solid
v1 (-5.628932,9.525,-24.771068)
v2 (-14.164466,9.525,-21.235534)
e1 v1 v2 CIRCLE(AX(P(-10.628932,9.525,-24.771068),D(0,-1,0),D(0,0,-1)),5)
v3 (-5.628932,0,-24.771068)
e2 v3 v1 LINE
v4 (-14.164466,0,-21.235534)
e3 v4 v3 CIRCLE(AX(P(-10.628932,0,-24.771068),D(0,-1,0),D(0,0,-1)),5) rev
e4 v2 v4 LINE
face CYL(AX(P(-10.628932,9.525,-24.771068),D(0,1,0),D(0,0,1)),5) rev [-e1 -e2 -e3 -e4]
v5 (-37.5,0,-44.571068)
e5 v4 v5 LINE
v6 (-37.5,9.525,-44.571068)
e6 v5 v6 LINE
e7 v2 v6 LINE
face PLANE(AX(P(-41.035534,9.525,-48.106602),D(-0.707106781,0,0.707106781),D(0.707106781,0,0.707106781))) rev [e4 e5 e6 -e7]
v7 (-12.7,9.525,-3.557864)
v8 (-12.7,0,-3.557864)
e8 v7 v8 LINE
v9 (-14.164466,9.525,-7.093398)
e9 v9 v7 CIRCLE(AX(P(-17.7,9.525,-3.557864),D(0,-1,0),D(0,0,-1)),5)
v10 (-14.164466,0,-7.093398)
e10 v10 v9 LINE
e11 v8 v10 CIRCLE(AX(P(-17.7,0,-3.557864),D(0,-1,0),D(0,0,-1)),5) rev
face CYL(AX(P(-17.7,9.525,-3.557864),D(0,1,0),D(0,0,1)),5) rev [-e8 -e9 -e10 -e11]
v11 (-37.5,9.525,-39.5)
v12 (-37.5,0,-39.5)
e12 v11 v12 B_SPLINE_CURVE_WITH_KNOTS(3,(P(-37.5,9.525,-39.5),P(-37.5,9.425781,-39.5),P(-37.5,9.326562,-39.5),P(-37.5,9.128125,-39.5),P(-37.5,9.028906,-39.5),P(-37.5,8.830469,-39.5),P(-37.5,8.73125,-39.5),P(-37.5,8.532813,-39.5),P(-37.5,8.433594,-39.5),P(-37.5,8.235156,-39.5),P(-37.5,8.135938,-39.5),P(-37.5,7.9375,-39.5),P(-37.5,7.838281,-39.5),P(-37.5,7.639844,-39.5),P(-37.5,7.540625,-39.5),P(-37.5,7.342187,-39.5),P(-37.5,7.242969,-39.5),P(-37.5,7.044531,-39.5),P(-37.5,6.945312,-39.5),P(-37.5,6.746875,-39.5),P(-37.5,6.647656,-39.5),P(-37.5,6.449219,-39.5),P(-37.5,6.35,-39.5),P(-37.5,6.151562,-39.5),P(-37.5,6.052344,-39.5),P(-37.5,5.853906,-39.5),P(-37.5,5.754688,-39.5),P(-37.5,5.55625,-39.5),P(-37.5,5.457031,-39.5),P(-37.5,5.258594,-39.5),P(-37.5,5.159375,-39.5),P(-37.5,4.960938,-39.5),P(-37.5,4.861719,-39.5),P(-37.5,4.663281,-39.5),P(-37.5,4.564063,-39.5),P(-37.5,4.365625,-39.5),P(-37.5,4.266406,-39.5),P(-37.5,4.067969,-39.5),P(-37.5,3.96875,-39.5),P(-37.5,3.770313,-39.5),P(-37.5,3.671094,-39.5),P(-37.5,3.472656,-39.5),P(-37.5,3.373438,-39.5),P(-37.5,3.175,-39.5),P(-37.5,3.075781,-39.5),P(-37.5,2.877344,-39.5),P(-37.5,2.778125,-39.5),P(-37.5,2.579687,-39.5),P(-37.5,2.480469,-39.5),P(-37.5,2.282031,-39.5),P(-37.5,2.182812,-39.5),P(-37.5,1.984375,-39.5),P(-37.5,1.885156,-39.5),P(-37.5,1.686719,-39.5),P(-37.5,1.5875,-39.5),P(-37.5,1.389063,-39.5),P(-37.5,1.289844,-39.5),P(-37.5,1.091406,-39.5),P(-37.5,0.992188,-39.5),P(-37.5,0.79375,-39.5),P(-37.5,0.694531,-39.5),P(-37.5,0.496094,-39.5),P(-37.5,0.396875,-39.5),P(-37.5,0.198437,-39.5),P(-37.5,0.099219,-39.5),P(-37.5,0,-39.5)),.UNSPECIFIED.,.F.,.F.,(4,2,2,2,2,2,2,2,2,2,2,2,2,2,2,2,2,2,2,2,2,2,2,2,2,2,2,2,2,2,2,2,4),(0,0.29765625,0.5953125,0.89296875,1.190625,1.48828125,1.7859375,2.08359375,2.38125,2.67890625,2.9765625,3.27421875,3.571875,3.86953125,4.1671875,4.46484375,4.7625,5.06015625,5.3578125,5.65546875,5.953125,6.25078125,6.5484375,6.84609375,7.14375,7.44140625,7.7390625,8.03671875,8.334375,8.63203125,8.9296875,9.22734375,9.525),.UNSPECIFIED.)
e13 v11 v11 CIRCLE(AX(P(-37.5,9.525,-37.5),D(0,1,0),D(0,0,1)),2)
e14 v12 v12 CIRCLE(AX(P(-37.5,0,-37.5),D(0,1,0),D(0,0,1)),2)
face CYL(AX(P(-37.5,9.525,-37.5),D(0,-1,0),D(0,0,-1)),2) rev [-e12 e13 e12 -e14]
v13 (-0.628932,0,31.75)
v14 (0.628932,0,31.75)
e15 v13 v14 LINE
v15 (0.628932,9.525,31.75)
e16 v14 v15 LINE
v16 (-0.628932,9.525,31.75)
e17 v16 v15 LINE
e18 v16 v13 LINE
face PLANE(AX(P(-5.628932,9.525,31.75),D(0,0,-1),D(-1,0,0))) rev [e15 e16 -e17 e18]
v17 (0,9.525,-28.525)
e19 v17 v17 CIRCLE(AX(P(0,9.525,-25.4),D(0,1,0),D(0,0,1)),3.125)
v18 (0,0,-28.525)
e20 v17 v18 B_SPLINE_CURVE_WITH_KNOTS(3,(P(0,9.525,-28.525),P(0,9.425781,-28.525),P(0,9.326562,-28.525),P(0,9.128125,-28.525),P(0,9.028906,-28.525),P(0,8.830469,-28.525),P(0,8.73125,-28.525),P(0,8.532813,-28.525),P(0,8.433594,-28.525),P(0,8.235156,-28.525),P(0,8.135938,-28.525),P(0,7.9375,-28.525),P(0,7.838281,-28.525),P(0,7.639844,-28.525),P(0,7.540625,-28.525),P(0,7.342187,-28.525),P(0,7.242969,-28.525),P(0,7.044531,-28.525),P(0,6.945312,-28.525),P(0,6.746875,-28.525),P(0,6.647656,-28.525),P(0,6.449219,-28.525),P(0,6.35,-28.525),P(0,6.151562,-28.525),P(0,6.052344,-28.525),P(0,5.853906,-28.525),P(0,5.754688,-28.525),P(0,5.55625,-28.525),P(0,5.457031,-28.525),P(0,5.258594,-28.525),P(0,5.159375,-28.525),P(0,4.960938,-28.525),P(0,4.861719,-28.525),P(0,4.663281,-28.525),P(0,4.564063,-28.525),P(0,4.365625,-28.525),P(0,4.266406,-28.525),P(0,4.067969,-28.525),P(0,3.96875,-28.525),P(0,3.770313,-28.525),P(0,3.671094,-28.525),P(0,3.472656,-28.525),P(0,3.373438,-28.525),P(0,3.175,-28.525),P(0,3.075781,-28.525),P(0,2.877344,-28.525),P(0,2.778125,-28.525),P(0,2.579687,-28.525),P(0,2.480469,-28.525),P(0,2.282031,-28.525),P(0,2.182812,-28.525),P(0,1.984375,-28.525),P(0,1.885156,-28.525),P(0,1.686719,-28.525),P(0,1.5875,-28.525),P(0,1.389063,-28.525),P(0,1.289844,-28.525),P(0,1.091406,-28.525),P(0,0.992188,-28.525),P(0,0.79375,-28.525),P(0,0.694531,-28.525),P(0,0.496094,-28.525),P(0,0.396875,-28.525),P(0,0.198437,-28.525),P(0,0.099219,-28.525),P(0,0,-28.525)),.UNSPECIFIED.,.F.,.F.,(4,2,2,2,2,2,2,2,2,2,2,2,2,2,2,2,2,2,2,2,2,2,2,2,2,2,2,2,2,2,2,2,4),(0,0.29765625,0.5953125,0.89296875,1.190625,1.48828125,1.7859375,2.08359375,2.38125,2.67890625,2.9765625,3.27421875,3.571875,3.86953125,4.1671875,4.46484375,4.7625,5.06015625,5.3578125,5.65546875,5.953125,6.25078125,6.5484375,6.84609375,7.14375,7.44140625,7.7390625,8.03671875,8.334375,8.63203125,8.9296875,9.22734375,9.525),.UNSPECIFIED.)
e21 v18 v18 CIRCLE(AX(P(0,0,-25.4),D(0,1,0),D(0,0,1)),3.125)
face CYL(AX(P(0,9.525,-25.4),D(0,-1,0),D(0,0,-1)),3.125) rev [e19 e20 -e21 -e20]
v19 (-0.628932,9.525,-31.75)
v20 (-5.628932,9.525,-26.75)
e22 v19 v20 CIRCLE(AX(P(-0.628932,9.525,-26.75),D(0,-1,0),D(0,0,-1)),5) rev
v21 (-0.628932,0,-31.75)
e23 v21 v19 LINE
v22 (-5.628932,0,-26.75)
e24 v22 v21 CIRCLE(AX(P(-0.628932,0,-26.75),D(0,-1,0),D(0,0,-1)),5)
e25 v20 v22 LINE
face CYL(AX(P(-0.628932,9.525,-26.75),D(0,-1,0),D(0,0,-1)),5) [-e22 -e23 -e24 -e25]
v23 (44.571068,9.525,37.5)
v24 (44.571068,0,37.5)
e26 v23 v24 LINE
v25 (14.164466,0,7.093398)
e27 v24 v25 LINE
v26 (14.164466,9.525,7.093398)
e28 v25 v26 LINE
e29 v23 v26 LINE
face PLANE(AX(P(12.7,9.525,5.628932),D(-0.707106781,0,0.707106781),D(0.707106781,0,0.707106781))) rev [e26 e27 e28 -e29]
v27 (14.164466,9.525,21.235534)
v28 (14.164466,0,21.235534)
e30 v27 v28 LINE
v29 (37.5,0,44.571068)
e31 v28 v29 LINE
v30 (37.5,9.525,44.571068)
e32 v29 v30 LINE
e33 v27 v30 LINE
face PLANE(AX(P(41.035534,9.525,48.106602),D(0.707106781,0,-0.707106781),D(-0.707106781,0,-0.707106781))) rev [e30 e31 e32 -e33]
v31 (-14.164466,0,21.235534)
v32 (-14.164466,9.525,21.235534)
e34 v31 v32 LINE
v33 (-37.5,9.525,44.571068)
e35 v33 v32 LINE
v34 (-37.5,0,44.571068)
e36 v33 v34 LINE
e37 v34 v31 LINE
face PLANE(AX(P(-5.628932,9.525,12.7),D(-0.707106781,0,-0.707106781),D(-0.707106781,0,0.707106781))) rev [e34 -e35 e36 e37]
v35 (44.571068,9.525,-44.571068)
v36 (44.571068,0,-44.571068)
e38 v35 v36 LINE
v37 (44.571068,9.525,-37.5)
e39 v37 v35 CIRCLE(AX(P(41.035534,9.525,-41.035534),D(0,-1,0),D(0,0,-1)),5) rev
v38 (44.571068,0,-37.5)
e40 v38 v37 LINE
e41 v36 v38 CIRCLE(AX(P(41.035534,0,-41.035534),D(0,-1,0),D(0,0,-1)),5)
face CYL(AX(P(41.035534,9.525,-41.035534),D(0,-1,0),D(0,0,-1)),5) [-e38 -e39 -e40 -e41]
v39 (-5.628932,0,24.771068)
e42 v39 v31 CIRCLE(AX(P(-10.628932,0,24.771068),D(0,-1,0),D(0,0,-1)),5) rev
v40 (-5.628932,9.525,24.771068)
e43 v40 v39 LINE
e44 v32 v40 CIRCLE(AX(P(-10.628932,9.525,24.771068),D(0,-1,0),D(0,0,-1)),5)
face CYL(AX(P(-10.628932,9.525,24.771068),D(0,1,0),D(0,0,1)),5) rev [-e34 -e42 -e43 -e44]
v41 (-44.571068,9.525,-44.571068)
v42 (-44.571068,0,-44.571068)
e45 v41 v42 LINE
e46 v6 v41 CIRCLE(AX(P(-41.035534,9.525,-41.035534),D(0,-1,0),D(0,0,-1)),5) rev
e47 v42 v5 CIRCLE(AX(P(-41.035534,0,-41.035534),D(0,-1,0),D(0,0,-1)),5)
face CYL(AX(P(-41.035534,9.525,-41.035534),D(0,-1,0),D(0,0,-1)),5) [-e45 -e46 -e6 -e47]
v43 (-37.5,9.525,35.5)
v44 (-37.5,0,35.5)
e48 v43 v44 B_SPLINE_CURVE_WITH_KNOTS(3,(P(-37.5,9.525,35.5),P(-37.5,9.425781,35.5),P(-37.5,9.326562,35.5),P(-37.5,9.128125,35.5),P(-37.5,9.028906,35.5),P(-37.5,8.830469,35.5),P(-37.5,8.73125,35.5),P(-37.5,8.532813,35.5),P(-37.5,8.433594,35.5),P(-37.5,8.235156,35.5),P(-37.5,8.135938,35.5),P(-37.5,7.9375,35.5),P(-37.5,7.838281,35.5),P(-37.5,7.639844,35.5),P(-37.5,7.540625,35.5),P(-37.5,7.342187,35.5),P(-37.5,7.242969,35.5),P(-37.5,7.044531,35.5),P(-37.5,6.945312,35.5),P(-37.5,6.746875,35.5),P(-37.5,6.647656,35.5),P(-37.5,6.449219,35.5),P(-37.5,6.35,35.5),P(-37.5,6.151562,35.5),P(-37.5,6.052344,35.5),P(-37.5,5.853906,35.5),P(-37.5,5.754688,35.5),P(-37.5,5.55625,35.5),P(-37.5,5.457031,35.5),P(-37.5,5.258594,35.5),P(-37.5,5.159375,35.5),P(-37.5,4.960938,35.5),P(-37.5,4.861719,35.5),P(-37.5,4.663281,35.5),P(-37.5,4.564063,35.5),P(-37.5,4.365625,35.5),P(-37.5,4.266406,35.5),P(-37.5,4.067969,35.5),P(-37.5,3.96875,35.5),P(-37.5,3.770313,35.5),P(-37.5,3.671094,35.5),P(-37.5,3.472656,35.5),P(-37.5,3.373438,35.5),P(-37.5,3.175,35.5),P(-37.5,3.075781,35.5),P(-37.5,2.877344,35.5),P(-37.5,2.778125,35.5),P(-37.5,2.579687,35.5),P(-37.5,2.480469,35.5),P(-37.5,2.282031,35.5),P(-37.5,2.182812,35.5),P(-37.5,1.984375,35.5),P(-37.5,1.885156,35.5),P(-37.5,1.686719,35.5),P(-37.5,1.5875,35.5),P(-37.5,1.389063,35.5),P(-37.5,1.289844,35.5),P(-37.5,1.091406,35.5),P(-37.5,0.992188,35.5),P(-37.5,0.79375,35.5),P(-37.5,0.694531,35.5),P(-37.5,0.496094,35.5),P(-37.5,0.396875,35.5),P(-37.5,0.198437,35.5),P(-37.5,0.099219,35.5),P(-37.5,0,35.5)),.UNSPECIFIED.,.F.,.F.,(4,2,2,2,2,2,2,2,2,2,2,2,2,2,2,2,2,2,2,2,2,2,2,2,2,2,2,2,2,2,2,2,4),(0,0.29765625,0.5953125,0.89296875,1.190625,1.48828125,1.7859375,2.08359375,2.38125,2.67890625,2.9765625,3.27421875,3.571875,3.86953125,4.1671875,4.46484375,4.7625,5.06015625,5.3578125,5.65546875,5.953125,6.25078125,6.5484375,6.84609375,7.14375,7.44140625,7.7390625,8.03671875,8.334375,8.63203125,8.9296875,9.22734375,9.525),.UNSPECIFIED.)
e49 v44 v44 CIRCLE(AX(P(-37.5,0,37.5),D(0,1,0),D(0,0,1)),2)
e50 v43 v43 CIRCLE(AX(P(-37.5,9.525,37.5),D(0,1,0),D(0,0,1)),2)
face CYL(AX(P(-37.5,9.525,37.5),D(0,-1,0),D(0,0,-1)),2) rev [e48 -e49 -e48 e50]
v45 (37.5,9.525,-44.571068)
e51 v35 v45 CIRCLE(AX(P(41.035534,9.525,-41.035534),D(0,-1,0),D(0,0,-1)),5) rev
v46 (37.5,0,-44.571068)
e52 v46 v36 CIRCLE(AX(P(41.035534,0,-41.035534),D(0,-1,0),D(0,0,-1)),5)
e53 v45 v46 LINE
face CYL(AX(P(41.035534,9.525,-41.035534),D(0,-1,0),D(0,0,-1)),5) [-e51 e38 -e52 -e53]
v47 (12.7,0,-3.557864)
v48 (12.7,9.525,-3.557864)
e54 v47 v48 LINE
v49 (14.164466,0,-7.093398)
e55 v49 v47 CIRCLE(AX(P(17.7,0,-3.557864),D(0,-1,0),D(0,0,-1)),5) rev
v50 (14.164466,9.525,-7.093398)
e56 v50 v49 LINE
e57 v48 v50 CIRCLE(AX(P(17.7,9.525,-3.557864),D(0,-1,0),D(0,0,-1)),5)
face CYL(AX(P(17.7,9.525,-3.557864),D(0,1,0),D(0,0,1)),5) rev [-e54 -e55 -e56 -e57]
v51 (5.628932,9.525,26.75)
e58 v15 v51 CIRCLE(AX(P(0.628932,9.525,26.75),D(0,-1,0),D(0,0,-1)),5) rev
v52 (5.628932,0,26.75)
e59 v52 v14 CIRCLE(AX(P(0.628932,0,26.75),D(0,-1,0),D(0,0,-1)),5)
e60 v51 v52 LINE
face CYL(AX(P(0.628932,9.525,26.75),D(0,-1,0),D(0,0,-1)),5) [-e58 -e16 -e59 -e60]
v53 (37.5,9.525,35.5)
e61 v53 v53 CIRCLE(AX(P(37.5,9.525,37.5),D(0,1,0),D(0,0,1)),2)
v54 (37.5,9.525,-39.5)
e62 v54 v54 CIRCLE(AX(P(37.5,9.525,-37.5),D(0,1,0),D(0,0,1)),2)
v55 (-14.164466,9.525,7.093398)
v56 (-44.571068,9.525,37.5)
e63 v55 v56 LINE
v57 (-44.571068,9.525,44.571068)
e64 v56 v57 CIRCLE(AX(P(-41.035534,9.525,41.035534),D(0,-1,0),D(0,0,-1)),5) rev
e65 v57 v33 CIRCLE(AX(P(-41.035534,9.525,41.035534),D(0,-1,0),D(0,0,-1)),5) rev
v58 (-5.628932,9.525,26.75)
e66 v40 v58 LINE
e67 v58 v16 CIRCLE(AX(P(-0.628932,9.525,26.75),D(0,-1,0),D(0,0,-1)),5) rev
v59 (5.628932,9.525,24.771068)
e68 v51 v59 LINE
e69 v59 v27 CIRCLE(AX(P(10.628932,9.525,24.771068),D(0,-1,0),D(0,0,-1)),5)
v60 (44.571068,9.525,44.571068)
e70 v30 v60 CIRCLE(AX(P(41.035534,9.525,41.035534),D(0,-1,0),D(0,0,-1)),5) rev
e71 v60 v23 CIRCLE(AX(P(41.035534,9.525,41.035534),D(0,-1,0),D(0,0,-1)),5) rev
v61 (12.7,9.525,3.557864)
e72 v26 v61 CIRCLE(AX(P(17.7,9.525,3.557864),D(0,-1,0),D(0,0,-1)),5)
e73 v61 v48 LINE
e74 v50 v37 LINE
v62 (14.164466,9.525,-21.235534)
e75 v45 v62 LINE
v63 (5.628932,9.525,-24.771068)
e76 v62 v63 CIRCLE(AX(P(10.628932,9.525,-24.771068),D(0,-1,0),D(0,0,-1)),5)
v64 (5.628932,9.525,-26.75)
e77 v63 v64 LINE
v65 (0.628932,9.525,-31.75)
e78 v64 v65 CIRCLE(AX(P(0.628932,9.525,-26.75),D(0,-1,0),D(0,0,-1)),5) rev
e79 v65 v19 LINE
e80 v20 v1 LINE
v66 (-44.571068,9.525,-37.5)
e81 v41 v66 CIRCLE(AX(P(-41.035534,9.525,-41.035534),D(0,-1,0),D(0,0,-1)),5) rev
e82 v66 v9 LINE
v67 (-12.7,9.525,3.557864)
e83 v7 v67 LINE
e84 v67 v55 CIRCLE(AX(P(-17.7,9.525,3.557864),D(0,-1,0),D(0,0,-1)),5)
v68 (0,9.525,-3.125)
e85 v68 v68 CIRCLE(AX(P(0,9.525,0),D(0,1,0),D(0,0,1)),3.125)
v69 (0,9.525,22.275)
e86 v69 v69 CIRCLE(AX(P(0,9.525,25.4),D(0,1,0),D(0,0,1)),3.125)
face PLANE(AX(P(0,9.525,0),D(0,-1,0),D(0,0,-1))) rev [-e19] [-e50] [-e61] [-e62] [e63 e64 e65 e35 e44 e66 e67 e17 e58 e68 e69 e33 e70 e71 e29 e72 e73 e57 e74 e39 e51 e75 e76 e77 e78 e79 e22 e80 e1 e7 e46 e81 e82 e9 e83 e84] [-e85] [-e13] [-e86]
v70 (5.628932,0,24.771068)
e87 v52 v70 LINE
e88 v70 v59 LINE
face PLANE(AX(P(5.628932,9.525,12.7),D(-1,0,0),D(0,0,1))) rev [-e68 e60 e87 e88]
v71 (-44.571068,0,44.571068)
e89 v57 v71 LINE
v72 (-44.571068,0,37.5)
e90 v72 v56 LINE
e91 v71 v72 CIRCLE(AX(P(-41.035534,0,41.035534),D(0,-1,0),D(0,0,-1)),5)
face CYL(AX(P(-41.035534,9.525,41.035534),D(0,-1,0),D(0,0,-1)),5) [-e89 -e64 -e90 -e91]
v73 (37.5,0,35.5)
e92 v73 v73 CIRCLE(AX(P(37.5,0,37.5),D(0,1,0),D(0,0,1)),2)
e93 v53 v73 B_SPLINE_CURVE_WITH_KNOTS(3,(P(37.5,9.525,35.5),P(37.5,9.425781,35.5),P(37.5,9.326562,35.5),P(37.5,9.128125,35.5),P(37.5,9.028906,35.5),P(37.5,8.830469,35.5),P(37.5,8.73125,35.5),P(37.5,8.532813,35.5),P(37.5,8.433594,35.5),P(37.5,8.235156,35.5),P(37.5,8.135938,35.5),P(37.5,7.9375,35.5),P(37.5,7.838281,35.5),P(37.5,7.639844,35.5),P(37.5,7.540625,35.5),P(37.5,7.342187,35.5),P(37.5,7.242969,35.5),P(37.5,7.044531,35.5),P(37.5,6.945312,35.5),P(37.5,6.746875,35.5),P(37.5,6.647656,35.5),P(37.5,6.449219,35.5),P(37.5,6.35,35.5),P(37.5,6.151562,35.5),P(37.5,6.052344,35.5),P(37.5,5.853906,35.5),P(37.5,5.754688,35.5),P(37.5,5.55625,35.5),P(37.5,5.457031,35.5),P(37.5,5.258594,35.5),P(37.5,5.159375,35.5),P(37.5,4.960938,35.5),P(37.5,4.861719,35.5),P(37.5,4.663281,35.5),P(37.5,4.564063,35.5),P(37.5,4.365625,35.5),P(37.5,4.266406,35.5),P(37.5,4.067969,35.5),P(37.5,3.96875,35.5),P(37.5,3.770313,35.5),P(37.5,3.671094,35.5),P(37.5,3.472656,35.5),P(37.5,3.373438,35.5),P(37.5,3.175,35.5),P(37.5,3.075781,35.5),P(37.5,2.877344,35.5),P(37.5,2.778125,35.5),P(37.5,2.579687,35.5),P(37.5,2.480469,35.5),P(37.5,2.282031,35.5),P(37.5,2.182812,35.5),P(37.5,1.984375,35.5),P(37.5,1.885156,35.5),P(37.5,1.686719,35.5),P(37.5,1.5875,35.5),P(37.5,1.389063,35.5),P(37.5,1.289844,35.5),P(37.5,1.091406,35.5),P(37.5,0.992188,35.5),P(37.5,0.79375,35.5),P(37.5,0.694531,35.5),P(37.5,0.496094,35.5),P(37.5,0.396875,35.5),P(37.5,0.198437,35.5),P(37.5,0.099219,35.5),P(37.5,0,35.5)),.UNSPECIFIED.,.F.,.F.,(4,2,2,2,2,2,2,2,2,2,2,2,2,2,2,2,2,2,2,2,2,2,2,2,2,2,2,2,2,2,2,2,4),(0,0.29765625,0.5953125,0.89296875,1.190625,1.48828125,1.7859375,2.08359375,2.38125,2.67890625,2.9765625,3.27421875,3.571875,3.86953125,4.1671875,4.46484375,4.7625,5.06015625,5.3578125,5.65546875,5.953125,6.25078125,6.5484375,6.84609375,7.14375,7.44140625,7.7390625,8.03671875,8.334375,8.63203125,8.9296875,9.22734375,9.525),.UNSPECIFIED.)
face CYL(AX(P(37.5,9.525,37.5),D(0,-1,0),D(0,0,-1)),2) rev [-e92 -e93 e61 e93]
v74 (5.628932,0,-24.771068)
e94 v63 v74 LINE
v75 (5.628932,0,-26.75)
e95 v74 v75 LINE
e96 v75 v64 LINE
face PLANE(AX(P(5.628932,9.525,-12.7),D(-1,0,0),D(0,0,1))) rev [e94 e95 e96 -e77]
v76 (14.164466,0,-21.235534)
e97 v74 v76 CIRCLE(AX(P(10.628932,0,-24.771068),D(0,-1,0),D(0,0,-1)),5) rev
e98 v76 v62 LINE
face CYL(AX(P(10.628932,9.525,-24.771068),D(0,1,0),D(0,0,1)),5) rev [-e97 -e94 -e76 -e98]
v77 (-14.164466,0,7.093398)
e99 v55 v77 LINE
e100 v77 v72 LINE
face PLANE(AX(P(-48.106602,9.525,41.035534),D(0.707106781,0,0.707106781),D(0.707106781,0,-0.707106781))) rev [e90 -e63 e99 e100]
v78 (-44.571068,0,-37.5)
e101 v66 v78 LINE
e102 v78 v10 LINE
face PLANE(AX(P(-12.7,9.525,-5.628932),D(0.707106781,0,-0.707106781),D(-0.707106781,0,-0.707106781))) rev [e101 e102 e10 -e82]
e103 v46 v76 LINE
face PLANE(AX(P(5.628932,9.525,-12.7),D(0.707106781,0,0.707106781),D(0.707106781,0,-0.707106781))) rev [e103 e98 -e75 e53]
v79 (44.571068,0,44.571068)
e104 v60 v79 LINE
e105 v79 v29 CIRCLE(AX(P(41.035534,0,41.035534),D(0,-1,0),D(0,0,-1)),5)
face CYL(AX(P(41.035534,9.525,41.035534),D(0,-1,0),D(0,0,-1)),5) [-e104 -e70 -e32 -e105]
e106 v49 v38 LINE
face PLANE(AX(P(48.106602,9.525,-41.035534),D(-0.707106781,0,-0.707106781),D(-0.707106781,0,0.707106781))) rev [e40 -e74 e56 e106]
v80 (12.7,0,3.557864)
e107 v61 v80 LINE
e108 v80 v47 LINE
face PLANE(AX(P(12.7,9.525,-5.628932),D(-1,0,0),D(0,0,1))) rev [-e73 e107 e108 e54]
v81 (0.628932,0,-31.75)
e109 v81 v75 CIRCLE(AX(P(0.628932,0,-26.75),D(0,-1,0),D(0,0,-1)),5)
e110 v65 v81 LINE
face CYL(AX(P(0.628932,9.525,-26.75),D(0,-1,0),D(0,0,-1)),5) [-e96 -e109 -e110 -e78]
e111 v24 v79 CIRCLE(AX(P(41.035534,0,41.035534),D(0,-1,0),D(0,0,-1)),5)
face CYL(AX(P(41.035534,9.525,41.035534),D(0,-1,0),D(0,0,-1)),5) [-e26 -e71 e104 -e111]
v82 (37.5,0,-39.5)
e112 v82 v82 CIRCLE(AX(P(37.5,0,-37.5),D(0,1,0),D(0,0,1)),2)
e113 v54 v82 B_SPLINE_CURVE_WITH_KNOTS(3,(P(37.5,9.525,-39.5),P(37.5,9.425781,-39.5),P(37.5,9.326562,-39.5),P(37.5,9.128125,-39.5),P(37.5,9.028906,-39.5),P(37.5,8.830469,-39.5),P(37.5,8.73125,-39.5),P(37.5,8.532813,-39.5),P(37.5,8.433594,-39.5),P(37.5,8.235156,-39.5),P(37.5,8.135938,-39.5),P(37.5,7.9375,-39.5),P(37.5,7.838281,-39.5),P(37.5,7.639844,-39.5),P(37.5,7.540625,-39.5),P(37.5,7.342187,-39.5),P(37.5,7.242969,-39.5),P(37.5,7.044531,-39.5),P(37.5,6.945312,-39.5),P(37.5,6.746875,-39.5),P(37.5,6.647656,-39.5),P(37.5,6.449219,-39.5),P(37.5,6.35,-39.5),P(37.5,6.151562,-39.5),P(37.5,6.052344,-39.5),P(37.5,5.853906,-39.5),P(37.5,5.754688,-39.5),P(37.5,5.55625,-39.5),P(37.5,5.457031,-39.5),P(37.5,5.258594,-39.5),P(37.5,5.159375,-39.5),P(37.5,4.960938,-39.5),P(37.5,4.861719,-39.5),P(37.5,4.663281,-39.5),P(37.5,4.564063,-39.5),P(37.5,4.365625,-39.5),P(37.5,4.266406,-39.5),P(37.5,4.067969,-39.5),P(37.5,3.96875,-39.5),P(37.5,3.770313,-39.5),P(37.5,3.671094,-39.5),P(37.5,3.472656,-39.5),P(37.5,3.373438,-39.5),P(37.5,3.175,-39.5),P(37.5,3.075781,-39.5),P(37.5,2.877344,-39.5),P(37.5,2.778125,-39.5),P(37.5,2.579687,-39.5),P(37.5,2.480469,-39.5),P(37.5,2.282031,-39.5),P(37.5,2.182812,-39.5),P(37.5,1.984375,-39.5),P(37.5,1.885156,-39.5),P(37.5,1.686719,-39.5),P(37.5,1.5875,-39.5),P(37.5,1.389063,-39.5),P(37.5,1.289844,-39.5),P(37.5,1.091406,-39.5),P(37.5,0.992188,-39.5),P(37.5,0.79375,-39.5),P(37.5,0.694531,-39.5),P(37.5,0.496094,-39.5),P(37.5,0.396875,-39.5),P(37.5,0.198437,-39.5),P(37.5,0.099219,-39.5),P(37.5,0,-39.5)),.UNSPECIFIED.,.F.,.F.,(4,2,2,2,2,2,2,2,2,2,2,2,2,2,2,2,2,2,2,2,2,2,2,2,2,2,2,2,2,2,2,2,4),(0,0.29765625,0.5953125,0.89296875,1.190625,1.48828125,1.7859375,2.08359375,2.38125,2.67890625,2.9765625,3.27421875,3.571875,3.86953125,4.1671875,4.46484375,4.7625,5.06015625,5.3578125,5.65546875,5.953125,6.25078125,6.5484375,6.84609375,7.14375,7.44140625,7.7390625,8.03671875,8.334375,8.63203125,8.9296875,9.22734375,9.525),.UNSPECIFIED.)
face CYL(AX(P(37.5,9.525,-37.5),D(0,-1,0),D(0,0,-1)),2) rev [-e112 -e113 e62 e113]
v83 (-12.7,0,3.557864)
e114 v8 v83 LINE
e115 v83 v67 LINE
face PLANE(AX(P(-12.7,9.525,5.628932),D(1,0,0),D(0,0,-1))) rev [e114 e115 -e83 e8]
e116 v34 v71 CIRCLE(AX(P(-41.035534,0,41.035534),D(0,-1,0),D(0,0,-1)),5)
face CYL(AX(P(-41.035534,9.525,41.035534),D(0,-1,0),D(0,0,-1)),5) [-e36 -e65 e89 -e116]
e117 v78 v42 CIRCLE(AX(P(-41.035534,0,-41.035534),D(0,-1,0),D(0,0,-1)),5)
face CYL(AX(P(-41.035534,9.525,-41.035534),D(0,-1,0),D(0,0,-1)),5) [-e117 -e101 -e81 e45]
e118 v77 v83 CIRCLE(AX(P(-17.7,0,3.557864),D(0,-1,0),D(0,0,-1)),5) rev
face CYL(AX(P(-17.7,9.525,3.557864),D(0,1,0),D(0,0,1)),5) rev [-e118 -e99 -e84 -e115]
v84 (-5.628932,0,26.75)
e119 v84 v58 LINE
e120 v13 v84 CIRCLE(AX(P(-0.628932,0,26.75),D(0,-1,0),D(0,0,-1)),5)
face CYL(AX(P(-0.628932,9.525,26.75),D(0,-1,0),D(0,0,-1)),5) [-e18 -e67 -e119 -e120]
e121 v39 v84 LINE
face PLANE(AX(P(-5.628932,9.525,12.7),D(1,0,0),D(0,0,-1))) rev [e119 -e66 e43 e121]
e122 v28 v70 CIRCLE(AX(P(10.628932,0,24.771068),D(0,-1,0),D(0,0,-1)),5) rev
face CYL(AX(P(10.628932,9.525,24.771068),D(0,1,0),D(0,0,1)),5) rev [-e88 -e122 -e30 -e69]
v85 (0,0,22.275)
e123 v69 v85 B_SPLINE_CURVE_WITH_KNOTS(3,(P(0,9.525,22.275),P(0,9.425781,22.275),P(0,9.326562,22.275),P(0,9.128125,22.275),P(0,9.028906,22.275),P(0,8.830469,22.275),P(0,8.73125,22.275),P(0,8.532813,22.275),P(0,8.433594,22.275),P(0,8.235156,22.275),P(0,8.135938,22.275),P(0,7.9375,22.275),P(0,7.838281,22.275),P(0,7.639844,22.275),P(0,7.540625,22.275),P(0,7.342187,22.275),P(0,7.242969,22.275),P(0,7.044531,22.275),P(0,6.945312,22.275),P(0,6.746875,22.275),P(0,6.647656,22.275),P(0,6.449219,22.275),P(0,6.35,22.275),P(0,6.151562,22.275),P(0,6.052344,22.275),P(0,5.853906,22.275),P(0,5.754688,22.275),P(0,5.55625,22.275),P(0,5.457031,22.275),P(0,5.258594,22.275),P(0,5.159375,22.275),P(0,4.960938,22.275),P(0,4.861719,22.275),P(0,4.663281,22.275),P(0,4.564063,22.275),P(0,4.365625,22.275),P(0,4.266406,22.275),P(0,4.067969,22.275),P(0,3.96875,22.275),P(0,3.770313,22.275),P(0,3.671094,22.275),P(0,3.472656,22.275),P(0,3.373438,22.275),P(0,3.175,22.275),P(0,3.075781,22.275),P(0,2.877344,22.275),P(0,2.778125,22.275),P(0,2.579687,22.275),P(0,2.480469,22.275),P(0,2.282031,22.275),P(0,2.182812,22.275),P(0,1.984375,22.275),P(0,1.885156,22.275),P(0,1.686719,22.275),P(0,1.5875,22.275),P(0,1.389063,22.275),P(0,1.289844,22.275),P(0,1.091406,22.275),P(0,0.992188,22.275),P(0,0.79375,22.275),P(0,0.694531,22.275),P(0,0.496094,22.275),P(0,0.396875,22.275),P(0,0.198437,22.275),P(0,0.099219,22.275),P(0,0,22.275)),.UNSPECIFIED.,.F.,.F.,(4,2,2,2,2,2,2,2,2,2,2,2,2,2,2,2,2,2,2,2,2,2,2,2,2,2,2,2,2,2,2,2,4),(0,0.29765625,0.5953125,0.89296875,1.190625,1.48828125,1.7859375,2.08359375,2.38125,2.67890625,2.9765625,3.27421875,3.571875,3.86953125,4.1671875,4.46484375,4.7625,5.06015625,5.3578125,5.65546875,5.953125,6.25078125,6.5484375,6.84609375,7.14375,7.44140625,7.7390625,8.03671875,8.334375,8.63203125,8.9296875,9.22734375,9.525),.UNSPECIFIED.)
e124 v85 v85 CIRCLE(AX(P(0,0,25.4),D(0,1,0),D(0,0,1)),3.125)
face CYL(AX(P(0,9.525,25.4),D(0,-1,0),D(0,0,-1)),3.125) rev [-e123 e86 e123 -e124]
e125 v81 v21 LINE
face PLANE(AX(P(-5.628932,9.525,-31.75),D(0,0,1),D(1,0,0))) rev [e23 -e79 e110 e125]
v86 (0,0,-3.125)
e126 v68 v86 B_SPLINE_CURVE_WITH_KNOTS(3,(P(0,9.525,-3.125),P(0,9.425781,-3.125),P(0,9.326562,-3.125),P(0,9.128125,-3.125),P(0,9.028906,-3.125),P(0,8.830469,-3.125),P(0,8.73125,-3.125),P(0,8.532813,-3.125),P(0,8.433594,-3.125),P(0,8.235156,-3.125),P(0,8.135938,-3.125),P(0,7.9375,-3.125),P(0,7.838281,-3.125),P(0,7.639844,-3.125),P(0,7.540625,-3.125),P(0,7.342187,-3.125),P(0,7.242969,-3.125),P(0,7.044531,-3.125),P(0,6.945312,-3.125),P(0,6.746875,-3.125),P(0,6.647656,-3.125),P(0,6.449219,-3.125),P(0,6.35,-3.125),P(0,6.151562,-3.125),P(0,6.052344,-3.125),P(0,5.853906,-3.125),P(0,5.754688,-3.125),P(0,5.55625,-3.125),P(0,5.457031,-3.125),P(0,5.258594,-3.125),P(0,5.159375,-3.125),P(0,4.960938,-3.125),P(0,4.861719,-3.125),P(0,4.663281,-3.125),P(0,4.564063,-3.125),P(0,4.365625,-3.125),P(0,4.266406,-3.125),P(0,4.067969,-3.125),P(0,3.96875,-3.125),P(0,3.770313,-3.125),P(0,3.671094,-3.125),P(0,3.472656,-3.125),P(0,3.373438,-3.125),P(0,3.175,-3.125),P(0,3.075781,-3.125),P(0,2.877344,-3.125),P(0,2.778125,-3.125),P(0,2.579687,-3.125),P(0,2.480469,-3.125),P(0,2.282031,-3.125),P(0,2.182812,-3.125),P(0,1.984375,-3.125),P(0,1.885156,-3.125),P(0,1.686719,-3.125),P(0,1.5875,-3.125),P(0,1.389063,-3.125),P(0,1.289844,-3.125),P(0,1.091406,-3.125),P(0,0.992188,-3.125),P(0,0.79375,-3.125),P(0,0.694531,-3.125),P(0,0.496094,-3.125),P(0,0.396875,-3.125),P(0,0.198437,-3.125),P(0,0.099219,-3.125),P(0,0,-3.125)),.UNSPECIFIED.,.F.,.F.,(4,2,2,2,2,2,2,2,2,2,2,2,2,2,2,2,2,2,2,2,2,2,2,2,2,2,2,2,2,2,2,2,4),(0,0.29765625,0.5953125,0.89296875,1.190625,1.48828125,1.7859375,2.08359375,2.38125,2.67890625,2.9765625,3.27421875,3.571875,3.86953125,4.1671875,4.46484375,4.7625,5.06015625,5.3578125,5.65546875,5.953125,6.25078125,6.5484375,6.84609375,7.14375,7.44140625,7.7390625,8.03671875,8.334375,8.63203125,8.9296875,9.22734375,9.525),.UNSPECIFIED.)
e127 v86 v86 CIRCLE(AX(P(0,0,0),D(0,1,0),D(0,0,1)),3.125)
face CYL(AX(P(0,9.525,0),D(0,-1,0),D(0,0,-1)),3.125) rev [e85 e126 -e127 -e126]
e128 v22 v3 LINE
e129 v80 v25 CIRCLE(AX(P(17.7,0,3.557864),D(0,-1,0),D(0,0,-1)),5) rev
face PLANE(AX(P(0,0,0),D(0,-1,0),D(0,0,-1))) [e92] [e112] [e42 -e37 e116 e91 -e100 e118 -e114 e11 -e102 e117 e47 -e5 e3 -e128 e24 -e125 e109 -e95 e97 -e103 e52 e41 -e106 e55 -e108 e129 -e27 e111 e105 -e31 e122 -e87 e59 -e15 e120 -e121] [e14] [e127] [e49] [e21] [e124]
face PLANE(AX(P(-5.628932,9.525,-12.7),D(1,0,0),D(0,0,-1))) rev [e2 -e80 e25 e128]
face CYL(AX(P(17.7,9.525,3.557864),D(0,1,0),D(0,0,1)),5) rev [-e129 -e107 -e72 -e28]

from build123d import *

# Parameters (mm, degrees)
SKETCH1_R           = 2
SKETCH1_R_2         = 3.125
BOSS_EXTRUDE1_DEPTH = 9.525
FILLET1_R           = 5


with BuildPart() as part:
    # Sketch1 → Boss-Extrude1 (new body)
    with BuildSketch(Plane(origin=(0, 0, 0), x_dir=(1, 0, 0), z_dir=(0, 1, 0))):
        Polygon((-12.7, 5.628932188), (-48.106601718, 41.035533906), (-41.035533906, 48.106601718), (-5.628932188, 12.7), (-5.628932188, 31.75), (5.628932188, 31.75), (5.628932188, 12.7), (41.035533906, 48.106601718), (48.106601718, 41.035533906), (12.7, 5.628932188), (12.7, -5.628932188), (48.106601718, -41.035533906), (41.035533906, -48.106601718), (5.628932188, -12.7), (5.628932188, -31.75), (-5.628932188, -31.75), (-5.628932188, -12.7), (-41.035533906, -48.106601718), (-48.106601718, -41.035533906), (-12.7, -5.628932188), align=None)
        with Locations(Location((37.5, 37.5, 0), (0, 0, 90))):
            Circle(SKETCH1_R, mode=Mode.SUBTRACT)
        with Locations(Location((37.5, -37.5, 0), (0, 0, 90))):
            Circle(SKETCH1_R, mode=Mode.SUBTRACT)
        with Locations(Location((-37.5, -37.5, 0), (0, 0, 90))):
            Circle(SKETCH1_R, mode=Mode.SUBTRACT)
        with Locations(Location((-37.5, 37.5, 0), (0, 0, 90))):
            Circle(SKETCH1_R, mode=Mode.SUBTRACT)
        with Locations(Location((0, 0, 0), (0, 0, 90))):
            Circle(SKETCH1_R_2, mode=Mode.SUBTRACT)
        with Locations(Location((0, 25.4, 0), (0, 0, 90))):
            Circle(SKETCH1_R_2, mode=Mode.SUBTRACT)
        with Locations(Location((0, -25.4, 0), (0, 0, 90))):
            Circle(SKETCH1_R_2, mode=Mode.SUBTRACT)
    extrude(amount=BOSS_EXTRUDE1_DEPTH)

    # Fillet1
    fillet1_edges = [part.edges().sort_by_distance(p)[0] for p in [
        (12.7, 4.7625, -5.628932188),
        (12.7, 4.7625, 5.628932188),
        (48.106601718, 4.7625, 41.035533906),
        (41.035533906, 4.7625, 48.106601718),
        (-41.035533906, 4.7625, 48.106601718),
        (-48.106601718, 4.7625, 41.035533906),
        (-12.7, 4.7625, 5.628932188),
        (-48.106601718, 4.7625, -41.035533906),
        (-41.035533906, 4.7625, -48.106601718),
        (41.035533906, 4.7625, -48.106601718),
        (48.106601718, 4.7625, -41.035533906),
        (-12.7, 4.7625, -5.628932188),
        (-5.628932188, 4.7625, 31.75),
        (-5.628932188, 4.7625, 12.7),
        (5.628932188, 4.7625, 12.7),
        (5.628932188, 4.7625, -12.7),
        (5.628932188, 4.7625, -31.75),
        (-5.628932188, 4.7625, -31.75),
        (-5.628932188, 4.7625, -12.7),
        (5.628932188, 4.7625, 31.75),
    ]]
    fillet(fillet1_edges, radius=FILLET1_R - 0.0001)  # a hair under: the kernel refuses the full size


solid = part.part
